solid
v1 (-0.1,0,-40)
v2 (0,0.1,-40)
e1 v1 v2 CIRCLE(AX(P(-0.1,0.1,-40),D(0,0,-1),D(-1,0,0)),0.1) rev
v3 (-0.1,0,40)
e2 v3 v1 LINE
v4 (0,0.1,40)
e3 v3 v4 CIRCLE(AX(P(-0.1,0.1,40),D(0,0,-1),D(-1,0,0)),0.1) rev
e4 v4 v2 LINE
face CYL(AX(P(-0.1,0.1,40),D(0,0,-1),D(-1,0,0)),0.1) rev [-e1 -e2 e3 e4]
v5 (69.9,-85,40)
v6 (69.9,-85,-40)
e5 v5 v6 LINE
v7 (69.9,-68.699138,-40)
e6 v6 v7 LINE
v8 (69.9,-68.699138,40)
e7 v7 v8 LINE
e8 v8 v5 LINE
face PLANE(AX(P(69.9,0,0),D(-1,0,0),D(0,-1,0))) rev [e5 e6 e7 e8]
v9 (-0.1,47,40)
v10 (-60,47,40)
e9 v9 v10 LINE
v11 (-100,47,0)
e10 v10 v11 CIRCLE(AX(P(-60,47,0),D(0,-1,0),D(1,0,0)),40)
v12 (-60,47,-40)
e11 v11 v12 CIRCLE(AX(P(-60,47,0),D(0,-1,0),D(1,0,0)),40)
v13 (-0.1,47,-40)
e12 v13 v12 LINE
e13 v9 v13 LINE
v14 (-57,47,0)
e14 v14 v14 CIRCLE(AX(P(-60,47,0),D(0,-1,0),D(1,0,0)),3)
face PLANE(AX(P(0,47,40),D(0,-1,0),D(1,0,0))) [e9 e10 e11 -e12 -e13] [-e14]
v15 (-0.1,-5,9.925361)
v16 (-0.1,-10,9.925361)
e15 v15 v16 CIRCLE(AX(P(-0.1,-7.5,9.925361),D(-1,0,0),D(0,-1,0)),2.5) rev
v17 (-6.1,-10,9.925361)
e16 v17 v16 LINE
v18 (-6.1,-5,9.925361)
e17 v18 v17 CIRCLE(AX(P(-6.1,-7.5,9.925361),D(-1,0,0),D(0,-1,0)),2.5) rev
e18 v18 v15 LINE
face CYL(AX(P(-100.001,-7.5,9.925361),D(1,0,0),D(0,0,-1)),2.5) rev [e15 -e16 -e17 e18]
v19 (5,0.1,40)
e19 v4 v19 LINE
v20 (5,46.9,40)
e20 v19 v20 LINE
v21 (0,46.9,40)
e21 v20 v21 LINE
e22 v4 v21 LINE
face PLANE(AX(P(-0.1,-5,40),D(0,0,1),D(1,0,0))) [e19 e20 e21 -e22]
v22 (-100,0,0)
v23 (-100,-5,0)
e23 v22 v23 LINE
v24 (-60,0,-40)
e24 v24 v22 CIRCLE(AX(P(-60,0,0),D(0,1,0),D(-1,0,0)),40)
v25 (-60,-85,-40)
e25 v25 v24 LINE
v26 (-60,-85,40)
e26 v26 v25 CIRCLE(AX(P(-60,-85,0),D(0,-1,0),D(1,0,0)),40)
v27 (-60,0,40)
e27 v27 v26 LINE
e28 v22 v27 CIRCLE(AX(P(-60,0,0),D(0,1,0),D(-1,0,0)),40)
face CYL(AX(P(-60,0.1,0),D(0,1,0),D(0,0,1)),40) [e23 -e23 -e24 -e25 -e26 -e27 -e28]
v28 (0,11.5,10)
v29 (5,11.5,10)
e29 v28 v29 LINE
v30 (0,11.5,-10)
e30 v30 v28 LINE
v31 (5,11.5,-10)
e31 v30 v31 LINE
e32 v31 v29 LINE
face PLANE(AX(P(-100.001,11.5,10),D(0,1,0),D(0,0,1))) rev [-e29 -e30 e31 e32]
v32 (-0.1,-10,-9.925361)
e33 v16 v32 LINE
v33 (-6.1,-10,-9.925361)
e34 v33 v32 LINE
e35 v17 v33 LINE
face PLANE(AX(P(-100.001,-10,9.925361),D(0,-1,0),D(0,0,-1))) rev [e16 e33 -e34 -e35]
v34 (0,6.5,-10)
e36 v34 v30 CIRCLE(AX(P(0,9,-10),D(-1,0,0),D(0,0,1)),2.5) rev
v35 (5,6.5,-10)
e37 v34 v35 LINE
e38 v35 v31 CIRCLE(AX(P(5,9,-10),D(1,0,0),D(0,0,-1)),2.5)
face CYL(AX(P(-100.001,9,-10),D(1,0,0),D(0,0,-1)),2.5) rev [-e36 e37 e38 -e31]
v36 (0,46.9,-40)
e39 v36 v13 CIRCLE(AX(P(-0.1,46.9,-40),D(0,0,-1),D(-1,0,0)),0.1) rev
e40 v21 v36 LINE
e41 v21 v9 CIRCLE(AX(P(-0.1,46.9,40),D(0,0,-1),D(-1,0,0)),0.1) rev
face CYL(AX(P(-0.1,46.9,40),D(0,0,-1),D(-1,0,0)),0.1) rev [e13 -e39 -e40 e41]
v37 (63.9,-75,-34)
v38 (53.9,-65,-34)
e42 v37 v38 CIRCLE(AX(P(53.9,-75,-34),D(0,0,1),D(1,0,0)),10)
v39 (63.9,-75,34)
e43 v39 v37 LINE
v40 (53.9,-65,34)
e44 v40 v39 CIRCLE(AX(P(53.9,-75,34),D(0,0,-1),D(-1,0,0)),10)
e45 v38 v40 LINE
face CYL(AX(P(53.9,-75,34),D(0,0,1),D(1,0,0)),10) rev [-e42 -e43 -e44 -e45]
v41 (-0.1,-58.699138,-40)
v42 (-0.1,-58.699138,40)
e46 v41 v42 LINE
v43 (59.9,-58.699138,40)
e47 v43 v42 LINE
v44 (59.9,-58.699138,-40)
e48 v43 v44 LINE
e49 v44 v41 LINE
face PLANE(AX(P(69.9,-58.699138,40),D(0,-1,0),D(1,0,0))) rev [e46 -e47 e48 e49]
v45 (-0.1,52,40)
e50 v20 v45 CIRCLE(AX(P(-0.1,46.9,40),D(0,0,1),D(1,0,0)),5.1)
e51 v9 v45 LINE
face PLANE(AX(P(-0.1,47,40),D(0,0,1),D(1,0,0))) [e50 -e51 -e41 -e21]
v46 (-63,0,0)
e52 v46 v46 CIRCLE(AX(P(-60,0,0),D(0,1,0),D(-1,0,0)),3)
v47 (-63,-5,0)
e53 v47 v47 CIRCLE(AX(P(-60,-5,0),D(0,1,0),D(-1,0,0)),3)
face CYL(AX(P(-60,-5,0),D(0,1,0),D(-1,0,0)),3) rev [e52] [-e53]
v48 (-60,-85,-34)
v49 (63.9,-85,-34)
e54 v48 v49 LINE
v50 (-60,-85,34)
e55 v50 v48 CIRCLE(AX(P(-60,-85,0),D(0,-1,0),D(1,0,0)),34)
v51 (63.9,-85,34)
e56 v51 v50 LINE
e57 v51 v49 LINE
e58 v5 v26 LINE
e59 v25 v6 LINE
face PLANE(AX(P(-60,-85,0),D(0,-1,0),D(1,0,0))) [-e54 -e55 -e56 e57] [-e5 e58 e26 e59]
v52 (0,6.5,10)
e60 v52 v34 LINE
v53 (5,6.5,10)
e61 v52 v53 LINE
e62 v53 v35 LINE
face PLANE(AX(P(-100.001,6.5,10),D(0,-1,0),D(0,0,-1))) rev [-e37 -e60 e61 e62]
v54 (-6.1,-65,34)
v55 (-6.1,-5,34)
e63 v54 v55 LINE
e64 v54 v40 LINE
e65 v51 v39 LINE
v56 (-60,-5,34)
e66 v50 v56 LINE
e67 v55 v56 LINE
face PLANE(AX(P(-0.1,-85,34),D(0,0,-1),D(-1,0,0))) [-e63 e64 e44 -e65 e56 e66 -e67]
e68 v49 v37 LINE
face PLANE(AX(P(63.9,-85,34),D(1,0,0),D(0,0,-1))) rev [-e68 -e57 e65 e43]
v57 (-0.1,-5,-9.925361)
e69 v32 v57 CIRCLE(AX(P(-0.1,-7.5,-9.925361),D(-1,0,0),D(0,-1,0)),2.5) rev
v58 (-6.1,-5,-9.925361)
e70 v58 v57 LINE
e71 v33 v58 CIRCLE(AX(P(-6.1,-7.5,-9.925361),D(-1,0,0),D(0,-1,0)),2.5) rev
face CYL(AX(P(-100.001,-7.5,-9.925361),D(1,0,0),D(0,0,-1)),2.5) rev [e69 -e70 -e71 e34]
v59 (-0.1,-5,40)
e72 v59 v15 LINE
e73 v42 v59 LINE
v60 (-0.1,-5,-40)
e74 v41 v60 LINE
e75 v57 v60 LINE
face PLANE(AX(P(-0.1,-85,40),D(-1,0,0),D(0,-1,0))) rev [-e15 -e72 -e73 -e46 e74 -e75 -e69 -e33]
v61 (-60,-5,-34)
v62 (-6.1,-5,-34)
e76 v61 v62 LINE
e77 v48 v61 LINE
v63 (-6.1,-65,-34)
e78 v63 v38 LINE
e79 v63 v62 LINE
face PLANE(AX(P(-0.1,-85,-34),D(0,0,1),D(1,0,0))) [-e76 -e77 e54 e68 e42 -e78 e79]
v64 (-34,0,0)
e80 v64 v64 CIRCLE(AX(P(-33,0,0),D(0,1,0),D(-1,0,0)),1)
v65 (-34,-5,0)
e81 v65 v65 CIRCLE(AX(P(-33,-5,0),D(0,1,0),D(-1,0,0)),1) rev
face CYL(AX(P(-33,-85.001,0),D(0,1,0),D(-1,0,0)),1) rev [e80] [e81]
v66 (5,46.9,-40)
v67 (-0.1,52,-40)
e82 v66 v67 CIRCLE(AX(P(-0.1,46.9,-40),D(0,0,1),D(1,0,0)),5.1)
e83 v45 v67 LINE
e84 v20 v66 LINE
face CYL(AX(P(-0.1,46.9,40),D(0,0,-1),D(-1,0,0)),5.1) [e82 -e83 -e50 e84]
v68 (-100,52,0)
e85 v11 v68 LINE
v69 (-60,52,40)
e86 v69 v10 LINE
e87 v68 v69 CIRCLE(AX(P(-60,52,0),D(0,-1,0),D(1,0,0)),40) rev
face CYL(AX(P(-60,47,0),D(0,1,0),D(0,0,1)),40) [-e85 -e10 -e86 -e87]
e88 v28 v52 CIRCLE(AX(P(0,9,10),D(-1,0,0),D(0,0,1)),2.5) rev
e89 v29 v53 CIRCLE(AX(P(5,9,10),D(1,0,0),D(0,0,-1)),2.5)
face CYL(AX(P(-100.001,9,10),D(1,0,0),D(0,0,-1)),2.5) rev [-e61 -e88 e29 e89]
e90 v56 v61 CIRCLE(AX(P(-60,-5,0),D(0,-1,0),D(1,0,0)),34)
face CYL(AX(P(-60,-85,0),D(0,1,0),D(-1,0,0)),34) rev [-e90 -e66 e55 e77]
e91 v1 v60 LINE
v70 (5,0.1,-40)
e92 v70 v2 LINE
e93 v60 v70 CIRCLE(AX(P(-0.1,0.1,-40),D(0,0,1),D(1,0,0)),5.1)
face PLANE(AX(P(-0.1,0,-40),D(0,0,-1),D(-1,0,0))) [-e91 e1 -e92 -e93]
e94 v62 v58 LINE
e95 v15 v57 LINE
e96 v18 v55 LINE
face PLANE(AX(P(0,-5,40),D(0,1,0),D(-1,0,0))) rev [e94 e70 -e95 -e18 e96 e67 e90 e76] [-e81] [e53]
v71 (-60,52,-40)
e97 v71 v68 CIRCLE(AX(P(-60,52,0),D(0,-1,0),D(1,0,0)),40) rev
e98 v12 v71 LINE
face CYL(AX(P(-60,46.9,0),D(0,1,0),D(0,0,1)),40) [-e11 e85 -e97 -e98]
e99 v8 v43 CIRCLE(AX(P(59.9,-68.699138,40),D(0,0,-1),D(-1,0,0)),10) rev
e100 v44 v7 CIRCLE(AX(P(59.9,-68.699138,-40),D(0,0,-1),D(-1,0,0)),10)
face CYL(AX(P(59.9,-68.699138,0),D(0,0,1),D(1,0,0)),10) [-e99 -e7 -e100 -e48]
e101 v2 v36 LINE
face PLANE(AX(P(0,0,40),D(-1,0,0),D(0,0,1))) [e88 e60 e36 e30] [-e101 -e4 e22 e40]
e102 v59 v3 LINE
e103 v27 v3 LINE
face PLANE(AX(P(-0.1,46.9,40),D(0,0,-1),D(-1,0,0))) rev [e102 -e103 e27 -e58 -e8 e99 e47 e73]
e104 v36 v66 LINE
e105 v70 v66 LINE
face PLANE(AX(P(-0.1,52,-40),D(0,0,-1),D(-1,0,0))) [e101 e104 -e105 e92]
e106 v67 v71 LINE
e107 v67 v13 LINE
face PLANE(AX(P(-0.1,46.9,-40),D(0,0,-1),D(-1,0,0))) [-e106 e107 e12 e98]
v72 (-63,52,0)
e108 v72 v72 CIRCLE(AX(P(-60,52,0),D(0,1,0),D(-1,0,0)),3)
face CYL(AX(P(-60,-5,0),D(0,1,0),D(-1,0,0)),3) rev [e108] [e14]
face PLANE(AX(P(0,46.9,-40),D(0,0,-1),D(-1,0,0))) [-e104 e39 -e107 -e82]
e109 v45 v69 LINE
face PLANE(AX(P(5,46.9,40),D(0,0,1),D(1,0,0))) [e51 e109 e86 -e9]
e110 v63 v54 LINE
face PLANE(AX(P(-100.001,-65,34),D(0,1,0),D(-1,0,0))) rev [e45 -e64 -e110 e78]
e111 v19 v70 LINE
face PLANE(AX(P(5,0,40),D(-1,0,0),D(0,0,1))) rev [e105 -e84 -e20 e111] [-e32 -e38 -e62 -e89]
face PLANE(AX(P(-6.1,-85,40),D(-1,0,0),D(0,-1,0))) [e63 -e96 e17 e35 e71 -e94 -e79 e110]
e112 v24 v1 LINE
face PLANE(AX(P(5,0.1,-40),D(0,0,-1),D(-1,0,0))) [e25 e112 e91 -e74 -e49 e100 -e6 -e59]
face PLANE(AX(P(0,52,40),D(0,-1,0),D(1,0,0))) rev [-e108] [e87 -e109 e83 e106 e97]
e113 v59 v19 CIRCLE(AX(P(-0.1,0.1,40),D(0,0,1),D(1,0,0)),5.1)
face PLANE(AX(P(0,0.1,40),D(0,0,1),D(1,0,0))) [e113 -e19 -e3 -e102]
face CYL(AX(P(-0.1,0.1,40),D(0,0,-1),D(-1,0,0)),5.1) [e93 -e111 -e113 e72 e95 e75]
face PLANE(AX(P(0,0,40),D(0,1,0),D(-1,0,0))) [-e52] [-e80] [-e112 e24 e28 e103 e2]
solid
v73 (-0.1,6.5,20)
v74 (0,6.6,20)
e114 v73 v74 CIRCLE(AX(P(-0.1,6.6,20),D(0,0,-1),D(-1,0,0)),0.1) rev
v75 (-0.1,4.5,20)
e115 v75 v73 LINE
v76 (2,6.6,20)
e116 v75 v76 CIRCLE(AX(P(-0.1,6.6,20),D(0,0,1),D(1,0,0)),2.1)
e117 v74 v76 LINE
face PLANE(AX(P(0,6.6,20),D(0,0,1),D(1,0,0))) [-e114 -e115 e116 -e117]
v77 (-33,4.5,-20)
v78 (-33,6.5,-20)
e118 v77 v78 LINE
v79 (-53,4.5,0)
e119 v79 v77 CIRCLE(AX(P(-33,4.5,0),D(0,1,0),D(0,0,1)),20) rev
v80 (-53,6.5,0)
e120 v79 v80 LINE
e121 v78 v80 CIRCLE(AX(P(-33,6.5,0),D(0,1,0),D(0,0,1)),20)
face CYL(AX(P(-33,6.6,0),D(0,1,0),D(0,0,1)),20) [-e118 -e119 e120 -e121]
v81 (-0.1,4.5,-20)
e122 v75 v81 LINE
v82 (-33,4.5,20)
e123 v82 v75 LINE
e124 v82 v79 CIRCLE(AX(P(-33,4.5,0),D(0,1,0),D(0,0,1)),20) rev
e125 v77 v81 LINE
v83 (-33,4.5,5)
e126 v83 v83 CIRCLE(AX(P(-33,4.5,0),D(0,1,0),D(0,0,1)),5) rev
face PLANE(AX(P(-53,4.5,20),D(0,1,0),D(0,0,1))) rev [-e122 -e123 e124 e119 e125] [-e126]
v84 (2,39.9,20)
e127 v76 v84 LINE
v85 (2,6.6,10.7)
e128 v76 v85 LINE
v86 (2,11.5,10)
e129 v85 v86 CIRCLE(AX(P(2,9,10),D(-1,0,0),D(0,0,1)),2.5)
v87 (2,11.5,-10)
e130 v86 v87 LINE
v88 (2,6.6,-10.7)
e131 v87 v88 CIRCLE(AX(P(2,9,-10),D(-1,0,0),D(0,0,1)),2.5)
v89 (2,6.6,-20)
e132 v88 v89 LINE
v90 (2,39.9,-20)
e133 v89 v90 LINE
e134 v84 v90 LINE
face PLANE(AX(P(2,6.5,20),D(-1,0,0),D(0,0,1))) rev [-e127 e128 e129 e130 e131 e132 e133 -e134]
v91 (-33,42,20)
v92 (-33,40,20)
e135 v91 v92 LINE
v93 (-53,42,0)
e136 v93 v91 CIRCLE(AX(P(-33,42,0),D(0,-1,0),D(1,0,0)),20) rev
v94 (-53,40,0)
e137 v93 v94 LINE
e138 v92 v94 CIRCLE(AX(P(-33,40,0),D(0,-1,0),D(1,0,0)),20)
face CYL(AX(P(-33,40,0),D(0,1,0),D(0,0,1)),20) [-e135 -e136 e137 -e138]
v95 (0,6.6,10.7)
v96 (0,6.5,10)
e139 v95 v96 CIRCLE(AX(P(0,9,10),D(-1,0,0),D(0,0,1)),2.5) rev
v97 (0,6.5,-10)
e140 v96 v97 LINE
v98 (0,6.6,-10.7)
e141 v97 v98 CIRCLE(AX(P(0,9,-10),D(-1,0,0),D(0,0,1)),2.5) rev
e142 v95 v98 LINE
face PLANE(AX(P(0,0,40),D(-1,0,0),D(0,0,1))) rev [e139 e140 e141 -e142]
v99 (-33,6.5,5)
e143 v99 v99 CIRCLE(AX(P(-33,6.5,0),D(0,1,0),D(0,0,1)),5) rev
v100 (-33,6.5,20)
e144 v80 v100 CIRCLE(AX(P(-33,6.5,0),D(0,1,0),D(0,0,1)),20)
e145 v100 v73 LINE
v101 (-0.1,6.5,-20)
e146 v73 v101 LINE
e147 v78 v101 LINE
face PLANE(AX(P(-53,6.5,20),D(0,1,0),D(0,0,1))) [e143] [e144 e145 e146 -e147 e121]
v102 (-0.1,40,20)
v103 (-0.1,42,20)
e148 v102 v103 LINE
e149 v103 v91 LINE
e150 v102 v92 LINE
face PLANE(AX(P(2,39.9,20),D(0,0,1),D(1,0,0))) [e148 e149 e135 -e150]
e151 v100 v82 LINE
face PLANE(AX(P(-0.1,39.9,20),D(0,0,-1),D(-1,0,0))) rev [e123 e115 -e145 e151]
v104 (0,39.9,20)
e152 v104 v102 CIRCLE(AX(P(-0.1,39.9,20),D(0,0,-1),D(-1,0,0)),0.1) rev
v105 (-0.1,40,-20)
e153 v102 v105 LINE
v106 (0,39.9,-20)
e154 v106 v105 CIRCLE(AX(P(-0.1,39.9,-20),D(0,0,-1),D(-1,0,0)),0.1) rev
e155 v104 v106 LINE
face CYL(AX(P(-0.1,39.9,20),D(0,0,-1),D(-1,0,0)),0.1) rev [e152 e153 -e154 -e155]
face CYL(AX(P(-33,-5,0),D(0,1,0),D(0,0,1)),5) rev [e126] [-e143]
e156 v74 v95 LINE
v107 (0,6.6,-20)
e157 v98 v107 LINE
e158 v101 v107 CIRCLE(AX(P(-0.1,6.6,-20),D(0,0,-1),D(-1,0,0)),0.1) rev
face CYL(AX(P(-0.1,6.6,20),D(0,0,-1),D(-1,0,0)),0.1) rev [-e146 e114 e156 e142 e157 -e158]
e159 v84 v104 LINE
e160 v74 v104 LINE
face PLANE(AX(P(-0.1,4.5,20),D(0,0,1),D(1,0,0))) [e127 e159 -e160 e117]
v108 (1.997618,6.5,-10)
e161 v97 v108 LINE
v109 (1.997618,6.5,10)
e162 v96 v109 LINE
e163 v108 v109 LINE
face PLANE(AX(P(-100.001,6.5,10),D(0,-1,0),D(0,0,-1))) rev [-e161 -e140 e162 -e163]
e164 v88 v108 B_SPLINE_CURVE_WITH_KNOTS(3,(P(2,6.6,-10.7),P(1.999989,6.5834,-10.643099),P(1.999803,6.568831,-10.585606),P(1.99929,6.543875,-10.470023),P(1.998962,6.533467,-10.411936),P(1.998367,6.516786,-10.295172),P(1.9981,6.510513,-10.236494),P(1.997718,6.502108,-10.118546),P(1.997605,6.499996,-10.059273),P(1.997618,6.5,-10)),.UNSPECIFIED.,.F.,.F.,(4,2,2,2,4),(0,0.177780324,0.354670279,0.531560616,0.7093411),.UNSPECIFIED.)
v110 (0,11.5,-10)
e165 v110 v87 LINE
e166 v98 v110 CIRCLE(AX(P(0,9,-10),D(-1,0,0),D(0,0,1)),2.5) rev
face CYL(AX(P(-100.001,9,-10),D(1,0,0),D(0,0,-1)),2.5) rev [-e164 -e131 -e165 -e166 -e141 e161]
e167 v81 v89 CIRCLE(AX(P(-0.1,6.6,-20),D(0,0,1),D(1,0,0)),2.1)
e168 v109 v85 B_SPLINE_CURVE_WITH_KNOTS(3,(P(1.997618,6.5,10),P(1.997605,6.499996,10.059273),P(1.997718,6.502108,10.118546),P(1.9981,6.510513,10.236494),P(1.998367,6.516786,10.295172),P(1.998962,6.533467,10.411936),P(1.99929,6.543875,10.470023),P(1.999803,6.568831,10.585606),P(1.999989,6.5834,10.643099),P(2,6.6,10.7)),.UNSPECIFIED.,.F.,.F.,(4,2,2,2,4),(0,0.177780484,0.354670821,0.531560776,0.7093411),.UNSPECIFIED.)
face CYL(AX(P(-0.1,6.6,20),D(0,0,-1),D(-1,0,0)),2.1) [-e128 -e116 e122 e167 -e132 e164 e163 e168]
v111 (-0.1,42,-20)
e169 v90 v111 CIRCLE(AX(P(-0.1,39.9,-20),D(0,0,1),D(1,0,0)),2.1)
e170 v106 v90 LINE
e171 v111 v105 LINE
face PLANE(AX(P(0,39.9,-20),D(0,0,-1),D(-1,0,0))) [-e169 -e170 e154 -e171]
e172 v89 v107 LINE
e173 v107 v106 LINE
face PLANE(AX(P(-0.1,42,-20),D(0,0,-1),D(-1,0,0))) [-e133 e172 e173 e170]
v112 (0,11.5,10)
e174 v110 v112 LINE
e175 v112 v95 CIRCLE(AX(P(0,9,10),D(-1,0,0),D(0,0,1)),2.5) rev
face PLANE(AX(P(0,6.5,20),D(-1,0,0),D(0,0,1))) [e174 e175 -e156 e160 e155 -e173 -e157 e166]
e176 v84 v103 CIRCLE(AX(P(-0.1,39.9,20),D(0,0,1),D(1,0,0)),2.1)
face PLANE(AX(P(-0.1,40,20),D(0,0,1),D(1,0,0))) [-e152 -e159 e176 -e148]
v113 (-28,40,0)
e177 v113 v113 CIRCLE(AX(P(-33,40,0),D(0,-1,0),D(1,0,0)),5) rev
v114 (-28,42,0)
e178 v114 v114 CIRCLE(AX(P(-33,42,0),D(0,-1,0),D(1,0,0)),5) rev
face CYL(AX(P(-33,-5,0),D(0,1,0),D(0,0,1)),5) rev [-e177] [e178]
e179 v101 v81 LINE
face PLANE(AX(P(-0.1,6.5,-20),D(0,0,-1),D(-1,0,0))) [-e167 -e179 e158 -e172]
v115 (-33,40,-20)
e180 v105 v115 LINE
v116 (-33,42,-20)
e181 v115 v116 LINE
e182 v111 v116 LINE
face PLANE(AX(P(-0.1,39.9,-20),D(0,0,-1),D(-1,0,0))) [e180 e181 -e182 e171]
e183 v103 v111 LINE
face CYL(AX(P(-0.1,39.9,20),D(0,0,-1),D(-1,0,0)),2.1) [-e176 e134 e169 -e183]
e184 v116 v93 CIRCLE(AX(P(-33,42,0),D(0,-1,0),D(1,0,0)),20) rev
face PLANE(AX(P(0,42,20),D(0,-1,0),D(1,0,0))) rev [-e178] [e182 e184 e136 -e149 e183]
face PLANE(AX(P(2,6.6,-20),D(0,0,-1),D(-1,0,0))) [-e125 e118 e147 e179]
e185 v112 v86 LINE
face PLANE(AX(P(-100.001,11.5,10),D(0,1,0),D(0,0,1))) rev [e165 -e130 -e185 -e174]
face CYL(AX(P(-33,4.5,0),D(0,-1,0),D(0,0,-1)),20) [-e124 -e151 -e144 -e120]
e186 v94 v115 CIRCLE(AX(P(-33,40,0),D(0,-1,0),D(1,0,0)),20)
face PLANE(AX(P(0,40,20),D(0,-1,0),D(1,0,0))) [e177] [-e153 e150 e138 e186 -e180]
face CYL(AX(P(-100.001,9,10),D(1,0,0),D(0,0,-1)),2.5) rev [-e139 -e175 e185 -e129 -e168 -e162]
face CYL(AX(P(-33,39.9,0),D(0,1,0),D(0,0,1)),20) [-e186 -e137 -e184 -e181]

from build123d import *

# Parameters (mm, degrees)
BASE_FLANGE1_DEPTH      = 40
BASE_FLANGE2_DEPTH      = 20
FILLET1_R               = 20
FILLET2_R               = 40
SKETCH10_R              = 3
CUT_EXTRUDE1_DEPTH      = 122.856472951
CUT_EXTRUDE2_DEPTH      = 117.726175299
CUT_EXTRUDE2_DEPTH_BACK = 117.726175299
SKETCH13_R              = 5
EXTRUDE_THIN1_DEPTH     = 80
SKETCH15_R              = 1
CUT_EXTRUDE3_DEPTH      = 5
CUT_EXTRUDE4_START      = -11.1
CUT_EXTRUDE4_DEPTH      = 6
CUT_EXTRUDE4_START_2    = -5
CUT_EXTRUDE4_2_DEPTH    = 5
SKETCH18_W              = 68
SKETCH18_H              = 20
CUT_EXTRUDE5_DEPTH      = 6
BOSS_EXTRUDE1_DEPTH     = 70
SKETCH20_W              = 6
SKETCH20_H              = 68
BOSS_EXTRUDE2_DEPTH     = 20
FILLET3_R               = 10


# Read off the part's stored shape, not the designer's step: Cut-Extrude4
# Sheet-metal steps are written as plain solids
with BuildPart() as part:
    # Sketch2 → Base-Flange1 (new, symmetric)
    with BuildSketch(Plane.XY):
        with BuildLine():
            Line((-100, 47), (-0.1, 47))
            ThreePointArc((-0.1, 47), (-0.029289322, 46.970710678), (0, 46.9))
            Line((0, 46.9), (0, 0.1))
            ThreePointArc((0, 0.1), (-0.029289322, 0.029289322), (-0.1, 0))
            Line((-0.1, 0), (-100, 0))
            Line((-100, 0), (-100, -5))
            Line((-100, -5), (-0.1, -5))
            ThreePointArc((-0.1, -5), (3.506244584, -3.506244584), (5, 0.1))
            Line((5, 0.1), (5, 46.9))
            ThreePointArc((5, 46.9), (3.506244584, 50.506244584), (-0.1, 52))
            Line((-0.1, 52), (-100, 52))
            Line((-100, 52), (-100, 47))
        make_face()
    extrude(amount=BASE_FLANGE1_DEPTH, both=True)

    # Fillet2
    fillet2_edges = [part.edges().sort_by_distance(p)[0] for p in [
        (-100, -2.5, 40),
        (-100, -2.5, -40),
        (-100, 49.5, -40),
        (-100, 49.5, 40),
    ]]
    fillet(fillet2_edges, radius=FILLET2_R - 0.0001)  # a hair under: the kernel refuses the full size

    # Sketch10 → Cut-Extrude1 (cut, through all)
    with BuildSketch(Plane(origin=(0, 52, 0), x_dir=(1, 0, 0), z_dir=(0, 1, 0))):
        with Locations(Location((-60, 0, 0), (0, 0, 180))):
            Circle(SKETCH10_R)
    extrude(amount=-CUT_EXTRUDE1_DEPTH, mode=Mode.SUBTRACT)

    # Sketch14 → Extrude-Thin1 (add)
    with BuildSketch(Plane.XZ.offset(5)):
        with BuildLine():
            Line((-60, 40), (-0.1, 40))
            Line((-0.1, 40), (-0.1, -40))
            Line((-0.1, -40), (-60, -40))
            ThreePointArc((-60, -40), (-100, 0), (-60, 40))
        make_face()
        with BuildLine():
            Line((-60, 34), (-6.1, 34))
            Line((-6.1, 34), (-6.1, -34))
            Line((-6.1, -34), (-60, -34))
            ThreePointArc((-60, -34), (-94, 0), (-60, 34))
        make_face(mode=Mode.SUBTRACT)
    extrude(amount=EXTRUDE_THIN1_DEPTH)

    # Sketch15 → Cut-Extrude3 (cut)
    with BuildSketch(Plane(origin=(0, 0, 0), x_dir=(1, 0, 0), z_dir=(0, 1, 0))):
        with Locations(Location((-33, 0, 0), (0, 0, 180))):
            Circle(SKETCH15_R)
    extrude(amount=-CUT_EXTRUDE3_DEPTH, mode=Mode.SUBTRACT)

    # Cut-Extrude4 outline → Cut-Extrude4 (cut)
    with BuildSketch(Plane(origin=(5, 0, 0), x_dir=(0, 0, -1), z_dir=(1, 0, 0)).offset(CUT_EXTRUDE4_START)):
        with BuildLine():
            ThreePointArc((-9.925361454, -5), (-12.425361454, -7.5), (-9.925361454, -10))
            Line((-9.925361454, -10), (9.925361454, -10))
            ThreePointArc((9.925361454, -10), (12.425361454, -7.5), (9.925361454, -5))
            Line((9.925361454, -5), (-9.925361454, -5))
        make_face()
    extrude(amount=CUT_EXTRUDE4_DEPTH, mode=Mode.SUBTRACT)


with BuildPart() as body_2:
    # Sketch7 → Base-Flange2 (new, symmetric)
    with BuildSketch(Plane.XY):
        with BuildLine():
            Line((-53, 6.5), (-0.1, 6.5))
            ThreePointArc((-0.1, 6.5), (-0.029289322, 6.529289322), (0, 6.6))
            Line((0, 6.6), (0, 39.9))
            ThreePointArc((0, 39.9), (-0.029289322, 39.970710678), (-0.1, 40))
            Line((-0.1, 40), (-53, 40))
            Line((-53, 40), (-53, 42))
            Line((-53, 42), (-0.1, 42))
            ThreePointArc((-0.1, 42), (1.38492424, 41.38492424), (2, 39.9))
            Line((2, 39.9), (2, 6.6))
            ThreePointArc((2, 6.6), (1.38492424, 5.11507576), (-0.1, 4.5))
            Line((-0.1, 4.5), (-53, 4.5))
            Line((-53, 4.5), (-53, 6.5))
        make_face()
    extrude(amount=BASE_FLANGE2_DEPTH, both=True)

    # Fillet1
    fillet1_edges = [body_2.edges().sort_by_distance(p)[0] for p in [
        (-53, 5.5, -20),
        (-53, 5.5, 20),
        (-53, 41, 20),
        (-53, 41, -20),
    ]]
    fillet(fillet1_edges, radius=FILLET1_R - 0.0001)  # a hair under: the kernel refuses the full size

    # Sketch13 → Cut-Extrude2 (cut, two sides: drawn at the far end of the back side and taken through both)
    with BuildSketch(Plane.XZ.offset(-40).offset(-CUT_EXTRUDE2_DEPTH_BACK)):
        with Locations(Location((-33, 0, 0), (0, 0, 90))):
            Circle(SKETCH13_R)
    extrude(amount=CUT_EXTRUDE2_DEPTH + CUT_EXTRUDE2_DEPTH_BACK, mode=Mode.SUBTRACT)


with BuildPart() as cut_extrude4_2_tool:
    # Cut-Extrude4 2 outline → Cut-Extrude4 2 (new body)
    with BuildSketch(Plane(origin=(5, 0, 0), x_dir=(0, 0, -1), z_dir=(1, 0, 0)).offset(CUT_EXTRUDE4_START_2)):
        with BuildLine():
            ThreePointArc((-10, 11.5), (-12.5, 9), (-10, 6.5))
            Line((-10, 6.5), (10, 6.5))
            ThreePointArc((10, 6.5), (12.5, 9), (10, 11.5))
            Line((10, 11.5), (-10, 11.5))
        make_face()
    extrude(amount=CUT_EXTRUDE4_2_DEPTH)


with BuildPart() as part_1:
    add(part.part)

    # Cut-Extrude4 2: cut by cut_extrude4_2_tool
    add(cut_extrude4_2_tool.part, mode=Mode.SUBTRACT)

    # Sketch18 → Cut-Extrude5 (cut)
    with BuildSketch(Plane(origin=(-0.1, 0, 0), x_dir=(0, 0, -1), z_dir=(1, 0, 0))):
        with Locations((0, -75)):
            Rectangle(SKETCH18_W, SKETCH18_H)
    extrude(amount=-CUT_EXTRUDE5_DEPTH, mode=Mode.SUBTRACT)

    # Sketch19 → Boss-Extrude1 (add)
    with BuildSketch(Plane(origin=(-0.1, 0, 0), x_dir=(0, 0, -1), z_dir=(1, 0, 0))):
        Polygon((-34, -85), (-40, -85), (-40, -58.699138256), (40, -58.699138256), (40, -85), (34, -85), (34, -65), (-34, -65), align=None)
    extrude(amount=BOSS_EXTRUDE1_DEPTH)

    # Sketch20 → Boss-Extrude2 (add)
    with BuildSketch(Plane.XZ.offset(65)):
        with Locations((66.9, 0)):
            Rectangle(SKETCH20_W, SKETCH20_H)
    extrude(amount=BOSS_EXTRUDE2_DEPTH)

    # Fillet3
    fillet3_edges = [part_1.edges().sort_by_distance(p)[0] for p in [
        (69.9, -58.699138256, 0),
        (63.9, -65, 0),
    ]]
    fillet(fillet3_edges, radius=FILLET3_R)


with BuildPart() as body_2_1:
    add(body_2.part)

    # Cut-Extrude4 2: cut by cut_extrude4_2_tool
    add(cut_extrude4_2_tool.part, mode=Mode.SUBTRACT)


solid = Compound([part_1.part, body_2_1.part])
